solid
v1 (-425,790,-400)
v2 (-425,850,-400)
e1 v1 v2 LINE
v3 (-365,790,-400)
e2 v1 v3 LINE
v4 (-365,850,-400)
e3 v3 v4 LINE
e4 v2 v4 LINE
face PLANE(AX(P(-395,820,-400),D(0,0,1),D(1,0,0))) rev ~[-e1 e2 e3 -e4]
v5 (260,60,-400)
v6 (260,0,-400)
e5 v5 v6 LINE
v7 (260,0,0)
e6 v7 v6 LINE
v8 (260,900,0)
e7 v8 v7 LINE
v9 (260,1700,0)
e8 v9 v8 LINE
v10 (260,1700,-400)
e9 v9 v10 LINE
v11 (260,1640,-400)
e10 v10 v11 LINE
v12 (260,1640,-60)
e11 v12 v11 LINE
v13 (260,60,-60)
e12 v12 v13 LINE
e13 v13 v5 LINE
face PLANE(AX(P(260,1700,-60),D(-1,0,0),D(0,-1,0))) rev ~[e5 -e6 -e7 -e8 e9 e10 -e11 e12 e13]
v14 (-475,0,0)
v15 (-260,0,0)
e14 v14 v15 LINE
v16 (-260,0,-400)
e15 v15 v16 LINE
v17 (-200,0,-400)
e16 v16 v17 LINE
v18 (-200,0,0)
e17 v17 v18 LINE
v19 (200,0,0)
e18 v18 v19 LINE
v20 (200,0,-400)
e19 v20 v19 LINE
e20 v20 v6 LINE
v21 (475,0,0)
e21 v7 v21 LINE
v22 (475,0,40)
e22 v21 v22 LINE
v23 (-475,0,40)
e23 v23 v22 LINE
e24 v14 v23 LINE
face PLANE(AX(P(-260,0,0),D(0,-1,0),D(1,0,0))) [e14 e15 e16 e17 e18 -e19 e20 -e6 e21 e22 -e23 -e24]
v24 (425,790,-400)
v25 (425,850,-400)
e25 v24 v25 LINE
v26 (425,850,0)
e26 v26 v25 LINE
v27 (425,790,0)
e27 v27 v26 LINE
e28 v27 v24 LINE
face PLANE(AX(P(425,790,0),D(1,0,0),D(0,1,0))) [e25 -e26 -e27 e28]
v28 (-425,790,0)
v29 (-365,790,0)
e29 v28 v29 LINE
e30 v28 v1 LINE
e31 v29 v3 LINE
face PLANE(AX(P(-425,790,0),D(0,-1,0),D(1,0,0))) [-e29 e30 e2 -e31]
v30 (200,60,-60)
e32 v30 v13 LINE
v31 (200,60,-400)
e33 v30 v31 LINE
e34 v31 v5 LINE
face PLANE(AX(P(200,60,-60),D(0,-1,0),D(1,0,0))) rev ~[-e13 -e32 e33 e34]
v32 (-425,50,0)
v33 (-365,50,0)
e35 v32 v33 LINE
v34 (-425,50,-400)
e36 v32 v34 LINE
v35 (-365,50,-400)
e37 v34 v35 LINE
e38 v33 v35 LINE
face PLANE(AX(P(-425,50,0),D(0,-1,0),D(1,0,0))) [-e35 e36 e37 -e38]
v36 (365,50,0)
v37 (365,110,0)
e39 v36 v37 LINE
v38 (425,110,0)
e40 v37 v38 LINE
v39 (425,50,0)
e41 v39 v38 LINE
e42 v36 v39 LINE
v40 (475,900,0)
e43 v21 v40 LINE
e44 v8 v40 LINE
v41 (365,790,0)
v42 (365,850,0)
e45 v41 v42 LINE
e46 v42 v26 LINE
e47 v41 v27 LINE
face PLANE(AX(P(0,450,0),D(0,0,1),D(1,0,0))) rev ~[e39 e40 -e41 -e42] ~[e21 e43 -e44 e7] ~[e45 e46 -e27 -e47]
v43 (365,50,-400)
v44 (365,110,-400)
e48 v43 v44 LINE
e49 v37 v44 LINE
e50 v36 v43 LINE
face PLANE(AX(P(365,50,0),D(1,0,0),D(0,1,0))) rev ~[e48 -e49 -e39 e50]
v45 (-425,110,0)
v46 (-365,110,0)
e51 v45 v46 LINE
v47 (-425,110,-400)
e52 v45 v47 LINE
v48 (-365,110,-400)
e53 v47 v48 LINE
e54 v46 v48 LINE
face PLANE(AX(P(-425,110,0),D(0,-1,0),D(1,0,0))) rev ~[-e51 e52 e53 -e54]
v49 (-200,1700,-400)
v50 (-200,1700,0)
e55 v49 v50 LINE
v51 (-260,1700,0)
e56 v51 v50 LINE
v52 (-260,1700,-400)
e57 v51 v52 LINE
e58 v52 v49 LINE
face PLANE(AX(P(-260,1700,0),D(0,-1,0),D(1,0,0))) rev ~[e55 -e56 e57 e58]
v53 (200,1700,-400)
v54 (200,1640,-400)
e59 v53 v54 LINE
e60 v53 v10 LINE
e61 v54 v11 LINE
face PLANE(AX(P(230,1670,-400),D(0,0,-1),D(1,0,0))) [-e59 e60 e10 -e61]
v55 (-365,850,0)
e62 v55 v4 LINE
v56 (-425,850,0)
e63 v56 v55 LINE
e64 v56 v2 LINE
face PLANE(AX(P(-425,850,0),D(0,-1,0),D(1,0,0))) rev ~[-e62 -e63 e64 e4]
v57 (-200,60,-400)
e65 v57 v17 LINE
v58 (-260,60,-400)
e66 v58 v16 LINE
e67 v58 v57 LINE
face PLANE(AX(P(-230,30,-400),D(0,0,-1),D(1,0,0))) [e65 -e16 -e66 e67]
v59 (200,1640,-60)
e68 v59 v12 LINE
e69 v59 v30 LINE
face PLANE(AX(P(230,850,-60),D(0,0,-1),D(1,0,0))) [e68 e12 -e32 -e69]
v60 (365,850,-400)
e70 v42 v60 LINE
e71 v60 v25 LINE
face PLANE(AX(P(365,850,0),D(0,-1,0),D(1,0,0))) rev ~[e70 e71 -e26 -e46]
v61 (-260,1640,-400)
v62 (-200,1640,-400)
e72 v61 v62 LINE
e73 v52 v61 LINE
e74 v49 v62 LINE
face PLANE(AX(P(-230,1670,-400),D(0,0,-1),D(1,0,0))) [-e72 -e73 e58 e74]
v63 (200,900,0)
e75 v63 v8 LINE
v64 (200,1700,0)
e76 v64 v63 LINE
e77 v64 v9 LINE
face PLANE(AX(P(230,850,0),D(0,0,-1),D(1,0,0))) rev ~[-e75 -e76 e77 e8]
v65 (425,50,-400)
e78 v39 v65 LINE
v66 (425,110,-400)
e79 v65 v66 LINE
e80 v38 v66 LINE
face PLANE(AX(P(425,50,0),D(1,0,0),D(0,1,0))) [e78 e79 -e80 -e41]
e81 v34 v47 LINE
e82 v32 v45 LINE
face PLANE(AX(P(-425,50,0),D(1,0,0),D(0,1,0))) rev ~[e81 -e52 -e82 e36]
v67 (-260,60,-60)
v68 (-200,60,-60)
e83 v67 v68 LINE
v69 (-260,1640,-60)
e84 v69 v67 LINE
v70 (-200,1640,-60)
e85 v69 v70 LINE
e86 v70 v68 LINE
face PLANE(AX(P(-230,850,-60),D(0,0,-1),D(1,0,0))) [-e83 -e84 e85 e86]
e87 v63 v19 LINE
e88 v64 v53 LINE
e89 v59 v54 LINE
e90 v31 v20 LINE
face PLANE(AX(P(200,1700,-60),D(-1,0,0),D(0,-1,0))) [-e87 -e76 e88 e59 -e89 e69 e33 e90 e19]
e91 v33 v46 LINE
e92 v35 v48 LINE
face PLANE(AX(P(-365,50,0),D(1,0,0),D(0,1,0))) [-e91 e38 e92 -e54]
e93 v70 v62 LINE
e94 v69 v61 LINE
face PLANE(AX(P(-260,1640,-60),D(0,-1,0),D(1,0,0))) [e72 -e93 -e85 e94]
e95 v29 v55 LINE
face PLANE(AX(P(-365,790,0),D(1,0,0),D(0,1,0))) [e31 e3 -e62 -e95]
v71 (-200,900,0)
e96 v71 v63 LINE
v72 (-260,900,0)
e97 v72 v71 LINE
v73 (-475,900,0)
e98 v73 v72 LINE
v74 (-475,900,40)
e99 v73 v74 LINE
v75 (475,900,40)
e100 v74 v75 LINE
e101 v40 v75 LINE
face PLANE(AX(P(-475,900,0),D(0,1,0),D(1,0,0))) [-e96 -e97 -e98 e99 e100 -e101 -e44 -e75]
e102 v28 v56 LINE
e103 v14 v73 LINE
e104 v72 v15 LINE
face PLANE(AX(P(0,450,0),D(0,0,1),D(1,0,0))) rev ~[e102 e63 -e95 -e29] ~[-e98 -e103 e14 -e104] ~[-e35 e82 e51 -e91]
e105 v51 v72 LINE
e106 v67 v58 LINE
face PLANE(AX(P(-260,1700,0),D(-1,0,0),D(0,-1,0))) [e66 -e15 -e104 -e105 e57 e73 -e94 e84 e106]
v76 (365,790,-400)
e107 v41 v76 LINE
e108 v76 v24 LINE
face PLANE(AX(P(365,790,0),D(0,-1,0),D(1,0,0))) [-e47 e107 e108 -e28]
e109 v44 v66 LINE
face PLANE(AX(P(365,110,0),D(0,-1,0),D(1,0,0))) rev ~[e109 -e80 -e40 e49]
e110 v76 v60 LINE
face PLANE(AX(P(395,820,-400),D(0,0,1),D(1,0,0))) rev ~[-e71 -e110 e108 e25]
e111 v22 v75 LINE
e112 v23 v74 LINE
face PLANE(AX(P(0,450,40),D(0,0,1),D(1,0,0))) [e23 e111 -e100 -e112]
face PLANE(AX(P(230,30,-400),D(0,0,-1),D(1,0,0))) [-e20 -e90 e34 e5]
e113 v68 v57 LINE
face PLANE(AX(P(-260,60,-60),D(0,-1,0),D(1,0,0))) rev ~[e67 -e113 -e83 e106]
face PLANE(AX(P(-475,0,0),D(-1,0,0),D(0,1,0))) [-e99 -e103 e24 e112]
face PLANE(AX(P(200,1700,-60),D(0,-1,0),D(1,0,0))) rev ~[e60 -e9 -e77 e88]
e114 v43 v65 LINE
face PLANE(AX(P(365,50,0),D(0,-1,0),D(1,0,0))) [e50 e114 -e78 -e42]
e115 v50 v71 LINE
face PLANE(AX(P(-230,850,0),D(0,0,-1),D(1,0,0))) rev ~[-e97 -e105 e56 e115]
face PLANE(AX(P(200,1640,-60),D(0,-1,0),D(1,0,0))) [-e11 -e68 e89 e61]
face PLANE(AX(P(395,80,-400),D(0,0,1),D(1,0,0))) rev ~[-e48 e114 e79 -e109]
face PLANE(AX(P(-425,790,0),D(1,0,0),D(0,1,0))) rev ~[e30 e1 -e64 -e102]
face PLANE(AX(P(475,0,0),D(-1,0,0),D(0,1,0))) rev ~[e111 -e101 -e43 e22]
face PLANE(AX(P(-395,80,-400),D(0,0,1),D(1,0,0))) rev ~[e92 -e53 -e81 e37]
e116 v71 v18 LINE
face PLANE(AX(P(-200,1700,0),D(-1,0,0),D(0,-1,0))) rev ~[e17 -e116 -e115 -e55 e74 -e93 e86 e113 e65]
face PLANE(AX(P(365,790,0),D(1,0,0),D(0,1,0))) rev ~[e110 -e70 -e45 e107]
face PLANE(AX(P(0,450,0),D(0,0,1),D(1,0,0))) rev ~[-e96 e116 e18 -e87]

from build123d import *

# Parameters (mm, degrees)
F0_W     = 950
F0_H     = 900
F0_W_2   = 60
F0_H_2   = 60
F1_DEPTH = 40
F2_DEPTH = 400
F3_W     = 60
F3_H     = 1700
F4_DEPTH = 60
F5_DEPTH = 60
F6_W     = 60
F6_H     = 60
F7_DEPTH = 340


# Not quite as in the source:
# - a feature names something its author has since deleted; it is built from what else it names


with BuildPart() as f1:
    # F0 (on Top) → F1 (new body)
    with BuildSketch(Plane.XY):
        with Locations((0, 450)):
            Rectangle(F0_W, F0_H)
        with Locations((-395, 80)):
            Rectangle(F0_W_2, F0_H_2, mode=Mode.SUBTRACT)
        with Locations((395, 80)):
            Rectangle(F0_W_2, F0_H_2, mode=Mode.SUBTRACT)
        with Locations((-395, 820)):
            Rectangle(F0_W_2, F0_H_2, mode=Mode.SUBTRACT)
        with Locations((395, 820)):
            Rectangle(F0_W_2, F0_H_2, mode=Mode.SUBTRACT)
        with Locations((-395, 80)):
            Rectangle(F0_W_2, F0_H_2)
        with Locations((-395, 820)):
            Rectangle(F0_W_2, F0_H_2)
        with Locations((395, 80)):
            Rectangle(F0_W_2, F0_H_2)
        with Locations((395, 820)):
            Rectangle(F0_W_2, F0_H_2)
    extrude(amount=F1_DEPTH)

    # F0 (on Top) → F2 (join)
    with BuildSketch(Plane.XY):
        with Locations((-395, 80)):
            Rectangle(F0_W_2, F0_H_2)
        with Locations((-395, 820)):
            Rectangle(F0_W_2, F0_H_2)
        with Locations((395, 80)):
            Rectangle(F0_W_2, F0_H_2)
        with Locations((395, 820)):
            Rectangle(F0_W_2, F0_H_2)
    extrude(amount=-F2_DEPTH)

    # F3 (on face) → F4 (join)
    with BuildSketch(Plane(origin=(0, 0, 0), x_dir=(1, 0, 0), z_dir=(0, 0, -1))):
        with Locations((-230, -850)):
            Rectangle(F3_W, F3_H)
        with Locations((230, -850)):
            Rectangle(F3_W, F3_H)
    extrude(amount=F4_DEPTH)

    # F3 (on face) → F5 (join)
    with BuildSketch(Plane(origin=(0, 0, 0), x_dir=(1, 0, 0), z_dir=(0, 0, -1))):
        with Locations((-230, -850)):
            Rectangle(F3_W, F3_H)
        with Locations((230, -850)):
            Rectangle(F3_W, F3_H)
    extrude(amount=F5_DEPTH)

    # F6 (on face) → F7 (join)
    with BuildSketch(Plane(origin=(0, 0, -60), x_dir=(1, 0, 0), z_dir=(0, 0, -1))):
        with Locations((230, -1670)):
            Rectangle(F6_W, F6_H)
        with Locations((-230, -1670)):
            Rectangle(F6_W, F6_H)
        with Locations((-230, -30)):
            Rectangle(F6_W, F6_H)
        with Locations((230, -30)):
            Rectangle(F6_W, F6_H)
    extrude(amount=F7_DEPTH)


solid = f1.part
